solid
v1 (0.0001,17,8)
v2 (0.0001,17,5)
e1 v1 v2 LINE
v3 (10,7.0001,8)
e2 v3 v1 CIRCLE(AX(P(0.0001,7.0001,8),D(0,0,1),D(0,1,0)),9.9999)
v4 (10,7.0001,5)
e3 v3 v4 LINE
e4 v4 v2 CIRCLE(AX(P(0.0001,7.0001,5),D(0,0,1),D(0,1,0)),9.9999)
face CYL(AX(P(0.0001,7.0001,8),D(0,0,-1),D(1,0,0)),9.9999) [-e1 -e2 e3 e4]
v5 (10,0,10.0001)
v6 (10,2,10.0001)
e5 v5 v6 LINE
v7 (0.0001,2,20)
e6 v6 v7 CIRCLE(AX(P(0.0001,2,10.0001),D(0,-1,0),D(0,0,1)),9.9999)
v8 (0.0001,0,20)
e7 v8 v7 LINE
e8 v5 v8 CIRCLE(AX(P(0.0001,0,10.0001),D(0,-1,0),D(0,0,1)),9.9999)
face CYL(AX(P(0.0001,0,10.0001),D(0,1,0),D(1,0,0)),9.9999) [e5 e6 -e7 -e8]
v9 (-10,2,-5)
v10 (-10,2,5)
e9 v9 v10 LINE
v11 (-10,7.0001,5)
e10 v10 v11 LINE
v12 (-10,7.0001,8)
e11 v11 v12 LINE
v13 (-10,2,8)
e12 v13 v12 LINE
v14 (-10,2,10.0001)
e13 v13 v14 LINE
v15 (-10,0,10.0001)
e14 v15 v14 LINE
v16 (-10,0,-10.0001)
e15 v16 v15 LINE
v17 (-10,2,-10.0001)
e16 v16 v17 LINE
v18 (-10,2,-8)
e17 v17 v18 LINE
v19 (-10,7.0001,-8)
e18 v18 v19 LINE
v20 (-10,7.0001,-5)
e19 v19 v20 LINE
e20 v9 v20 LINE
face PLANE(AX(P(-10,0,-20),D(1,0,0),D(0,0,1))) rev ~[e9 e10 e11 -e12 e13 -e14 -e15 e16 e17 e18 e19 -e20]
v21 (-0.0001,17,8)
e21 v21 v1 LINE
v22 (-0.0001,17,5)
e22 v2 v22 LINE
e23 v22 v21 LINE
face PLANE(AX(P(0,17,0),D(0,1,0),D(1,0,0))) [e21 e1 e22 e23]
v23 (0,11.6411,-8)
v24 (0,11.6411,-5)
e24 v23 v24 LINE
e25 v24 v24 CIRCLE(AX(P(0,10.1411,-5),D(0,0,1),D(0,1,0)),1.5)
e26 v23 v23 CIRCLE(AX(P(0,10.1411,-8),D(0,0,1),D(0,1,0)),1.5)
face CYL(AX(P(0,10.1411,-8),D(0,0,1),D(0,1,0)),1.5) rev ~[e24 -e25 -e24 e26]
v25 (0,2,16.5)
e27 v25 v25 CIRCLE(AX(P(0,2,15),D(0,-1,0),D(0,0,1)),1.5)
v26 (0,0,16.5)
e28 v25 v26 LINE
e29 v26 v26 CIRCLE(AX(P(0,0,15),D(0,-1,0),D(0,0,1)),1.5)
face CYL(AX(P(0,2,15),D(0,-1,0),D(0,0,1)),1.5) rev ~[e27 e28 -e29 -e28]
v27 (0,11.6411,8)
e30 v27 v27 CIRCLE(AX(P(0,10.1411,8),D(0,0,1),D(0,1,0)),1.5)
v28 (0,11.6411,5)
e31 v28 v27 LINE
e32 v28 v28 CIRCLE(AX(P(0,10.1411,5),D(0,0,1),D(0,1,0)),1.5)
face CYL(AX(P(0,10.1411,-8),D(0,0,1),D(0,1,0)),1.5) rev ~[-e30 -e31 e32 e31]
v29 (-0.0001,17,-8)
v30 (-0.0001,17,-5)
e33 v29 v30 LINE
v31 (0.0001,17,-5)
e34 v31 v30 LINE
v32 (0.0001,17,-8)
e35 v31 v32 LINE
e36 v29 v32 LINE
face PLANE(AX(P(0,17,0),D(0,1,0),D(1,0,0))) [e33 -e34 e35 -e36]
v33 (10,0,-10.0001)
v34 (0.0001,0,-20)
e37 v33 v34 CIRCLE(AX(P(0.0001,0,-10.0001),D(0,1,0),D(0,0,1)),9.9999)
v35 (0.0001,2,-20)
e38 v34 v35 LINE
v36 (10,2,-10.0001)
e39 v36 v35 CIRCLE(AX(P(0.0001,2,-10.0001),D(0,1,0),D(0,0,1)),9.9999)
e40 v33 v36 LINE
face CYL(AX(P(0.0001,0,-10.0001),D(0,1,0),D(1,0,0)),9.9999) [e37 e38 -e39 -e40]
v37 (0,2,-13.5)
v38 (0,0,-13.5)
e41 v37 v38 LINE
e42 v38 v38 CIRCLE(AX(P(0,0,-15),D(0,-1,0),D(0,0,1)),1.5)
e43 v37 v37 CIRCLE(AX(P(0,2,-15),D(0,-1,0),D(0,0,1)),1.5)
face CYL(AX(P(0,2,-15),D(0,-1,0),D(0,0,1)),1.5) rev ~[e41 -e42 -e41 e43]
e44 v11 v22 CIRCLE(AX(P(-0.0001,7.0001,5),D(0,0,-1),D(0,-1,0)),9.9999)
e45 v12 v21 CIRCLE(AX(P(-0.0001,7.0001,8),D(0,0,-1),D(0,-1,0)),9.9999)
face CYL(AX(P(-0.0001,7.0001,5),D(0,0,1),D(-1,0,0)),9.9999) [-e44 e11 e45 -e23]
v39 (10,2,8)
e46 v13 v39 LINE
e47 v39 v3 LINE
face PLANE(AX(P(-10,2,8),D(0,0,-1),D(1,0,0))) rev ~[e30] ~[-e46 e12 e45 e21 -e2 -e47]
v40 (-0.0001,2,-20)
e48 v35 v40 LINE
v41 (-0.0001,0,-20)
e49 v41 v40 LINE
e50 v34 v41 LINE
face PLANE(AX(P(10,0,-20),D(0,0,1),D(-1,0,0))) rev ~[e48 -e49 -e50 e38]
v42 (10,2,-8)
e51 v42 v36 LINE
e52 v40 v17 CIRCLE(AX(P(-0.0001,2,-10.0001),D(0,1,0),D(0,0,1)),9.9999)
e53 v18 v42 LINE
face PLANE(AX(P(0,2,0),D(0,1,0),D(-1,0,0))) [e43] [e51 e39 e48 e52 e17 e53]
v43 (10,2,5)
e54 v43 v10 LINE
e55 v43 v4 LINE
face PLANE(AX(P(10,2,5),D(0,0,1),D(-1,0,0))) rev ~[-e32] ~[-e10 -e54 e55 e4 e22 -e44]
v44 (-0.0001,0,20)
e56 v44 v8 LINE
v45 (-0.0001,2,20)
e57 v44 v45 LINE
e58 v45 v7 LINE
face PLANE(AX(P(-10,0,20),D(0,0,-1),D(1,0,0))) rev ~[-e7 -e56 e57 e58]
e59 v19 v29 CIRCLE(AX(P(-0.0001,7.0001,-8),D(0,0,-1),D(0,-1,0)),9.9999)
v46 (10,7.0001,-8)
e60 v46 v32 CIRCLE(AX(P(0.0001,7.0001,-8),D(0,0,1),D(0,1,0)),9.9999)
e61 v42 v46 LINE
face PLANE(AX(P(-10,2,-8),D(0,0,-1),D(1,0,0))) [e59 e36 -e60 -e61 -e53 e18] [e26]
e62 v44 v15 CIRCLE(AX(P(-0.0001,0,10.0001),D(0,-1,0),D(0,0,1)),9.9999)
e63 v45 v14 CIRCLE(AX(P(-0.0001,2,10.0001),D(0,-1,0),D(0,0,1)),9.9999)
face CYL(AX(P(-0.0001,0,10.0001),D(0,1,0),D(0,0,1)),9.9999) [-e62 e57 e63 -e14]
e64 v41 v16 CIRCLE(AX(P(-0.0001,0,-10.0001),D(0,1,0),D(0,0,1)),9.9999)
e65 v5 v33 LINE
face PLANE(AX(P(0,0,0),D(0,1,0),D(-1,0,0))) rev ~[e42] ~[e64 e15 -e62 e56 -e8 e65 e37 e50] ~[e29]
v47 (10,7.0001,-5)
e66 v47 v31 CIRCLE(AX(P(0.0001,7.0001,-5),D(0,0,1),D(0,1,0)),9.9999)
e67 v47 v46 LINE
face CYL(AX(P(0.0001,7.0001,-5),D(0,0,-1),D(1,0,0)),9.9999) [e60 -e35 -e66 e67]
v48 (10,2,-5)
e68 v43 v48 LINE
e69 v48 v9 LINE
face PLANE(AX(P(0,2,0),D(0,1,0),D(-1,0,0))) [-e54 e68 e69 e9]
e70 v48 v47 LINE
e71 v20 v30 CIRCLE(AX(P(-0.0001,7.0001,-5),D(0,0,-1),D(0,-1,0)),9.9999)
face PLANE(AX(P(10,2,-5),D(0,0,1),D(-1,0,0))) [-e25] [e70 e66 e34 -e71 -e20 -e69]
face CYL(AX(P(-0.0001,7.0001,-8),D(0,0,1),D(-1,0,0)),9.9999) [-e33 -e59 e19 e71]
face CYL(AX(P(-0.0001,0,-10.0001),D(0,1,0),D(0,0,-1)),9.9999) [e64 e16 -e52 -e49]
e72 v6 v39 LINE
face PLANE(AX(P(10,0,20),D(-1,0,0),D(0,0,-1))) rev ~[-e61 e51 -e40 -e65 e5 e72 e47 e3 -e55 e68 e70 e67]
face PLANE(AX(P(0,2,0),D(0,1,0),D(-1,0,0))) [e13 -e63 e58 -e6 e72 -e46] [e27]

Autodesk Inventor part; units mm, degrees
ref_plane "YZ Plane" through (0, 0, 0) normal (1, 0, 0) x (0, 1, 0)
ref_plane "XZ Plane" through (0, 0, 0) normal (0, 1, 0) x (-1, 0, 0)
ref_plane "XY Plane" through (0, 0, 0) normal (0, 0, 1) x (1, 0, 0)
sketch "Sketch1" plane through (0, 0, 0) normal (0, 1, 0) x (-1, 0, 0)
  line L0 (-10, -20) -> (10, -20)
  line L1 (10, -20) -> (10, 20)
  line L2 (10, 20) -> (-10, 20)
  line L3 (-10, 20) -> (-10, -20)
  line L4 (-10, -20) -> (10, 20) construction
  line L5 (10, -20) -> (-10, 20) construction
  point P0 (0, 0)
  dimension "d0" = 20
  dimension "d1" = 40
extrude "Extrusion1" add sketch "Sketch1" along normal blind 2
sketch "Sketch3" plane through (0, 2, 0) normal (0, 1, 0) x (1, 0, 0)
  line L0 (-10, 20) -> (-10, -20) projected
  line L1 (10, -20) -> (10, 20) projected
  line L2 (-10, -8) -> (10, -8)
  line L3 (10, -8) -> (10, -5)
  line L4 (10, -5) -> (-10, -5)
  line L5 (-10, -5) -> (-10, -8)
  line L6 (-6.0097, 0) -> (5.0263, 0)
  line L7 (-10, 8) -> (10, 8)
  line L8 (10, 8) -> (10, 5)
  line L9 (10, 5) -> (-10, 5)
  line L10 (-10, 5) -> (-10, 8)
  point P0 (0, 0)
  dimension "d6" = 3
  dimension "d7" = 5
extrude "Extrusion2" add sketch "Sketch3" along normal blind 15 contours L7 L1 L9 L0 | L4 L1 L2 L0
fillet "Fillet1" radius 10 4 edges at (10, 17, 6.5) (-10, 17, 6.5) (10, 17, -6.5) (-10, 17, -6.5)
sketch "Sketch4" plane through (0, 2, 0) normal (0, 1, 0) x (1, 0, 0)
  line L0 (10, 20) -> (-10, 20) projected
  line L1 (-10, -20) -> (10, -20) projected
  point P0 (0, 0)
  point P1 (0, 15)
  point P2 (0, -15)
  dimension "d11" = 5
  dimension "d12" = 5
hole "Hole1" at (0, 2, -15) at (0, 2, 15) direction (0, -1, 0) diameter 3 end through all
fillet "Fillet2" radius 10 4 edges at (10, 1, 20) (-10, 1, 20) (-10, 1, -20) (10, 1, -20)
sketch "Sketch5" plane through (10, 2, -8) normal (0, 0, -1) x (-1, 0, 0)
  point P0 (10, -2)
  point P1 (10, 8.1411)
hole "Hole2" at (0, 10.1411, -8) direction (0, 0, 1) diameter 3 end through all
properties part number "turretSupport" material "PC/ABS Plastic"
